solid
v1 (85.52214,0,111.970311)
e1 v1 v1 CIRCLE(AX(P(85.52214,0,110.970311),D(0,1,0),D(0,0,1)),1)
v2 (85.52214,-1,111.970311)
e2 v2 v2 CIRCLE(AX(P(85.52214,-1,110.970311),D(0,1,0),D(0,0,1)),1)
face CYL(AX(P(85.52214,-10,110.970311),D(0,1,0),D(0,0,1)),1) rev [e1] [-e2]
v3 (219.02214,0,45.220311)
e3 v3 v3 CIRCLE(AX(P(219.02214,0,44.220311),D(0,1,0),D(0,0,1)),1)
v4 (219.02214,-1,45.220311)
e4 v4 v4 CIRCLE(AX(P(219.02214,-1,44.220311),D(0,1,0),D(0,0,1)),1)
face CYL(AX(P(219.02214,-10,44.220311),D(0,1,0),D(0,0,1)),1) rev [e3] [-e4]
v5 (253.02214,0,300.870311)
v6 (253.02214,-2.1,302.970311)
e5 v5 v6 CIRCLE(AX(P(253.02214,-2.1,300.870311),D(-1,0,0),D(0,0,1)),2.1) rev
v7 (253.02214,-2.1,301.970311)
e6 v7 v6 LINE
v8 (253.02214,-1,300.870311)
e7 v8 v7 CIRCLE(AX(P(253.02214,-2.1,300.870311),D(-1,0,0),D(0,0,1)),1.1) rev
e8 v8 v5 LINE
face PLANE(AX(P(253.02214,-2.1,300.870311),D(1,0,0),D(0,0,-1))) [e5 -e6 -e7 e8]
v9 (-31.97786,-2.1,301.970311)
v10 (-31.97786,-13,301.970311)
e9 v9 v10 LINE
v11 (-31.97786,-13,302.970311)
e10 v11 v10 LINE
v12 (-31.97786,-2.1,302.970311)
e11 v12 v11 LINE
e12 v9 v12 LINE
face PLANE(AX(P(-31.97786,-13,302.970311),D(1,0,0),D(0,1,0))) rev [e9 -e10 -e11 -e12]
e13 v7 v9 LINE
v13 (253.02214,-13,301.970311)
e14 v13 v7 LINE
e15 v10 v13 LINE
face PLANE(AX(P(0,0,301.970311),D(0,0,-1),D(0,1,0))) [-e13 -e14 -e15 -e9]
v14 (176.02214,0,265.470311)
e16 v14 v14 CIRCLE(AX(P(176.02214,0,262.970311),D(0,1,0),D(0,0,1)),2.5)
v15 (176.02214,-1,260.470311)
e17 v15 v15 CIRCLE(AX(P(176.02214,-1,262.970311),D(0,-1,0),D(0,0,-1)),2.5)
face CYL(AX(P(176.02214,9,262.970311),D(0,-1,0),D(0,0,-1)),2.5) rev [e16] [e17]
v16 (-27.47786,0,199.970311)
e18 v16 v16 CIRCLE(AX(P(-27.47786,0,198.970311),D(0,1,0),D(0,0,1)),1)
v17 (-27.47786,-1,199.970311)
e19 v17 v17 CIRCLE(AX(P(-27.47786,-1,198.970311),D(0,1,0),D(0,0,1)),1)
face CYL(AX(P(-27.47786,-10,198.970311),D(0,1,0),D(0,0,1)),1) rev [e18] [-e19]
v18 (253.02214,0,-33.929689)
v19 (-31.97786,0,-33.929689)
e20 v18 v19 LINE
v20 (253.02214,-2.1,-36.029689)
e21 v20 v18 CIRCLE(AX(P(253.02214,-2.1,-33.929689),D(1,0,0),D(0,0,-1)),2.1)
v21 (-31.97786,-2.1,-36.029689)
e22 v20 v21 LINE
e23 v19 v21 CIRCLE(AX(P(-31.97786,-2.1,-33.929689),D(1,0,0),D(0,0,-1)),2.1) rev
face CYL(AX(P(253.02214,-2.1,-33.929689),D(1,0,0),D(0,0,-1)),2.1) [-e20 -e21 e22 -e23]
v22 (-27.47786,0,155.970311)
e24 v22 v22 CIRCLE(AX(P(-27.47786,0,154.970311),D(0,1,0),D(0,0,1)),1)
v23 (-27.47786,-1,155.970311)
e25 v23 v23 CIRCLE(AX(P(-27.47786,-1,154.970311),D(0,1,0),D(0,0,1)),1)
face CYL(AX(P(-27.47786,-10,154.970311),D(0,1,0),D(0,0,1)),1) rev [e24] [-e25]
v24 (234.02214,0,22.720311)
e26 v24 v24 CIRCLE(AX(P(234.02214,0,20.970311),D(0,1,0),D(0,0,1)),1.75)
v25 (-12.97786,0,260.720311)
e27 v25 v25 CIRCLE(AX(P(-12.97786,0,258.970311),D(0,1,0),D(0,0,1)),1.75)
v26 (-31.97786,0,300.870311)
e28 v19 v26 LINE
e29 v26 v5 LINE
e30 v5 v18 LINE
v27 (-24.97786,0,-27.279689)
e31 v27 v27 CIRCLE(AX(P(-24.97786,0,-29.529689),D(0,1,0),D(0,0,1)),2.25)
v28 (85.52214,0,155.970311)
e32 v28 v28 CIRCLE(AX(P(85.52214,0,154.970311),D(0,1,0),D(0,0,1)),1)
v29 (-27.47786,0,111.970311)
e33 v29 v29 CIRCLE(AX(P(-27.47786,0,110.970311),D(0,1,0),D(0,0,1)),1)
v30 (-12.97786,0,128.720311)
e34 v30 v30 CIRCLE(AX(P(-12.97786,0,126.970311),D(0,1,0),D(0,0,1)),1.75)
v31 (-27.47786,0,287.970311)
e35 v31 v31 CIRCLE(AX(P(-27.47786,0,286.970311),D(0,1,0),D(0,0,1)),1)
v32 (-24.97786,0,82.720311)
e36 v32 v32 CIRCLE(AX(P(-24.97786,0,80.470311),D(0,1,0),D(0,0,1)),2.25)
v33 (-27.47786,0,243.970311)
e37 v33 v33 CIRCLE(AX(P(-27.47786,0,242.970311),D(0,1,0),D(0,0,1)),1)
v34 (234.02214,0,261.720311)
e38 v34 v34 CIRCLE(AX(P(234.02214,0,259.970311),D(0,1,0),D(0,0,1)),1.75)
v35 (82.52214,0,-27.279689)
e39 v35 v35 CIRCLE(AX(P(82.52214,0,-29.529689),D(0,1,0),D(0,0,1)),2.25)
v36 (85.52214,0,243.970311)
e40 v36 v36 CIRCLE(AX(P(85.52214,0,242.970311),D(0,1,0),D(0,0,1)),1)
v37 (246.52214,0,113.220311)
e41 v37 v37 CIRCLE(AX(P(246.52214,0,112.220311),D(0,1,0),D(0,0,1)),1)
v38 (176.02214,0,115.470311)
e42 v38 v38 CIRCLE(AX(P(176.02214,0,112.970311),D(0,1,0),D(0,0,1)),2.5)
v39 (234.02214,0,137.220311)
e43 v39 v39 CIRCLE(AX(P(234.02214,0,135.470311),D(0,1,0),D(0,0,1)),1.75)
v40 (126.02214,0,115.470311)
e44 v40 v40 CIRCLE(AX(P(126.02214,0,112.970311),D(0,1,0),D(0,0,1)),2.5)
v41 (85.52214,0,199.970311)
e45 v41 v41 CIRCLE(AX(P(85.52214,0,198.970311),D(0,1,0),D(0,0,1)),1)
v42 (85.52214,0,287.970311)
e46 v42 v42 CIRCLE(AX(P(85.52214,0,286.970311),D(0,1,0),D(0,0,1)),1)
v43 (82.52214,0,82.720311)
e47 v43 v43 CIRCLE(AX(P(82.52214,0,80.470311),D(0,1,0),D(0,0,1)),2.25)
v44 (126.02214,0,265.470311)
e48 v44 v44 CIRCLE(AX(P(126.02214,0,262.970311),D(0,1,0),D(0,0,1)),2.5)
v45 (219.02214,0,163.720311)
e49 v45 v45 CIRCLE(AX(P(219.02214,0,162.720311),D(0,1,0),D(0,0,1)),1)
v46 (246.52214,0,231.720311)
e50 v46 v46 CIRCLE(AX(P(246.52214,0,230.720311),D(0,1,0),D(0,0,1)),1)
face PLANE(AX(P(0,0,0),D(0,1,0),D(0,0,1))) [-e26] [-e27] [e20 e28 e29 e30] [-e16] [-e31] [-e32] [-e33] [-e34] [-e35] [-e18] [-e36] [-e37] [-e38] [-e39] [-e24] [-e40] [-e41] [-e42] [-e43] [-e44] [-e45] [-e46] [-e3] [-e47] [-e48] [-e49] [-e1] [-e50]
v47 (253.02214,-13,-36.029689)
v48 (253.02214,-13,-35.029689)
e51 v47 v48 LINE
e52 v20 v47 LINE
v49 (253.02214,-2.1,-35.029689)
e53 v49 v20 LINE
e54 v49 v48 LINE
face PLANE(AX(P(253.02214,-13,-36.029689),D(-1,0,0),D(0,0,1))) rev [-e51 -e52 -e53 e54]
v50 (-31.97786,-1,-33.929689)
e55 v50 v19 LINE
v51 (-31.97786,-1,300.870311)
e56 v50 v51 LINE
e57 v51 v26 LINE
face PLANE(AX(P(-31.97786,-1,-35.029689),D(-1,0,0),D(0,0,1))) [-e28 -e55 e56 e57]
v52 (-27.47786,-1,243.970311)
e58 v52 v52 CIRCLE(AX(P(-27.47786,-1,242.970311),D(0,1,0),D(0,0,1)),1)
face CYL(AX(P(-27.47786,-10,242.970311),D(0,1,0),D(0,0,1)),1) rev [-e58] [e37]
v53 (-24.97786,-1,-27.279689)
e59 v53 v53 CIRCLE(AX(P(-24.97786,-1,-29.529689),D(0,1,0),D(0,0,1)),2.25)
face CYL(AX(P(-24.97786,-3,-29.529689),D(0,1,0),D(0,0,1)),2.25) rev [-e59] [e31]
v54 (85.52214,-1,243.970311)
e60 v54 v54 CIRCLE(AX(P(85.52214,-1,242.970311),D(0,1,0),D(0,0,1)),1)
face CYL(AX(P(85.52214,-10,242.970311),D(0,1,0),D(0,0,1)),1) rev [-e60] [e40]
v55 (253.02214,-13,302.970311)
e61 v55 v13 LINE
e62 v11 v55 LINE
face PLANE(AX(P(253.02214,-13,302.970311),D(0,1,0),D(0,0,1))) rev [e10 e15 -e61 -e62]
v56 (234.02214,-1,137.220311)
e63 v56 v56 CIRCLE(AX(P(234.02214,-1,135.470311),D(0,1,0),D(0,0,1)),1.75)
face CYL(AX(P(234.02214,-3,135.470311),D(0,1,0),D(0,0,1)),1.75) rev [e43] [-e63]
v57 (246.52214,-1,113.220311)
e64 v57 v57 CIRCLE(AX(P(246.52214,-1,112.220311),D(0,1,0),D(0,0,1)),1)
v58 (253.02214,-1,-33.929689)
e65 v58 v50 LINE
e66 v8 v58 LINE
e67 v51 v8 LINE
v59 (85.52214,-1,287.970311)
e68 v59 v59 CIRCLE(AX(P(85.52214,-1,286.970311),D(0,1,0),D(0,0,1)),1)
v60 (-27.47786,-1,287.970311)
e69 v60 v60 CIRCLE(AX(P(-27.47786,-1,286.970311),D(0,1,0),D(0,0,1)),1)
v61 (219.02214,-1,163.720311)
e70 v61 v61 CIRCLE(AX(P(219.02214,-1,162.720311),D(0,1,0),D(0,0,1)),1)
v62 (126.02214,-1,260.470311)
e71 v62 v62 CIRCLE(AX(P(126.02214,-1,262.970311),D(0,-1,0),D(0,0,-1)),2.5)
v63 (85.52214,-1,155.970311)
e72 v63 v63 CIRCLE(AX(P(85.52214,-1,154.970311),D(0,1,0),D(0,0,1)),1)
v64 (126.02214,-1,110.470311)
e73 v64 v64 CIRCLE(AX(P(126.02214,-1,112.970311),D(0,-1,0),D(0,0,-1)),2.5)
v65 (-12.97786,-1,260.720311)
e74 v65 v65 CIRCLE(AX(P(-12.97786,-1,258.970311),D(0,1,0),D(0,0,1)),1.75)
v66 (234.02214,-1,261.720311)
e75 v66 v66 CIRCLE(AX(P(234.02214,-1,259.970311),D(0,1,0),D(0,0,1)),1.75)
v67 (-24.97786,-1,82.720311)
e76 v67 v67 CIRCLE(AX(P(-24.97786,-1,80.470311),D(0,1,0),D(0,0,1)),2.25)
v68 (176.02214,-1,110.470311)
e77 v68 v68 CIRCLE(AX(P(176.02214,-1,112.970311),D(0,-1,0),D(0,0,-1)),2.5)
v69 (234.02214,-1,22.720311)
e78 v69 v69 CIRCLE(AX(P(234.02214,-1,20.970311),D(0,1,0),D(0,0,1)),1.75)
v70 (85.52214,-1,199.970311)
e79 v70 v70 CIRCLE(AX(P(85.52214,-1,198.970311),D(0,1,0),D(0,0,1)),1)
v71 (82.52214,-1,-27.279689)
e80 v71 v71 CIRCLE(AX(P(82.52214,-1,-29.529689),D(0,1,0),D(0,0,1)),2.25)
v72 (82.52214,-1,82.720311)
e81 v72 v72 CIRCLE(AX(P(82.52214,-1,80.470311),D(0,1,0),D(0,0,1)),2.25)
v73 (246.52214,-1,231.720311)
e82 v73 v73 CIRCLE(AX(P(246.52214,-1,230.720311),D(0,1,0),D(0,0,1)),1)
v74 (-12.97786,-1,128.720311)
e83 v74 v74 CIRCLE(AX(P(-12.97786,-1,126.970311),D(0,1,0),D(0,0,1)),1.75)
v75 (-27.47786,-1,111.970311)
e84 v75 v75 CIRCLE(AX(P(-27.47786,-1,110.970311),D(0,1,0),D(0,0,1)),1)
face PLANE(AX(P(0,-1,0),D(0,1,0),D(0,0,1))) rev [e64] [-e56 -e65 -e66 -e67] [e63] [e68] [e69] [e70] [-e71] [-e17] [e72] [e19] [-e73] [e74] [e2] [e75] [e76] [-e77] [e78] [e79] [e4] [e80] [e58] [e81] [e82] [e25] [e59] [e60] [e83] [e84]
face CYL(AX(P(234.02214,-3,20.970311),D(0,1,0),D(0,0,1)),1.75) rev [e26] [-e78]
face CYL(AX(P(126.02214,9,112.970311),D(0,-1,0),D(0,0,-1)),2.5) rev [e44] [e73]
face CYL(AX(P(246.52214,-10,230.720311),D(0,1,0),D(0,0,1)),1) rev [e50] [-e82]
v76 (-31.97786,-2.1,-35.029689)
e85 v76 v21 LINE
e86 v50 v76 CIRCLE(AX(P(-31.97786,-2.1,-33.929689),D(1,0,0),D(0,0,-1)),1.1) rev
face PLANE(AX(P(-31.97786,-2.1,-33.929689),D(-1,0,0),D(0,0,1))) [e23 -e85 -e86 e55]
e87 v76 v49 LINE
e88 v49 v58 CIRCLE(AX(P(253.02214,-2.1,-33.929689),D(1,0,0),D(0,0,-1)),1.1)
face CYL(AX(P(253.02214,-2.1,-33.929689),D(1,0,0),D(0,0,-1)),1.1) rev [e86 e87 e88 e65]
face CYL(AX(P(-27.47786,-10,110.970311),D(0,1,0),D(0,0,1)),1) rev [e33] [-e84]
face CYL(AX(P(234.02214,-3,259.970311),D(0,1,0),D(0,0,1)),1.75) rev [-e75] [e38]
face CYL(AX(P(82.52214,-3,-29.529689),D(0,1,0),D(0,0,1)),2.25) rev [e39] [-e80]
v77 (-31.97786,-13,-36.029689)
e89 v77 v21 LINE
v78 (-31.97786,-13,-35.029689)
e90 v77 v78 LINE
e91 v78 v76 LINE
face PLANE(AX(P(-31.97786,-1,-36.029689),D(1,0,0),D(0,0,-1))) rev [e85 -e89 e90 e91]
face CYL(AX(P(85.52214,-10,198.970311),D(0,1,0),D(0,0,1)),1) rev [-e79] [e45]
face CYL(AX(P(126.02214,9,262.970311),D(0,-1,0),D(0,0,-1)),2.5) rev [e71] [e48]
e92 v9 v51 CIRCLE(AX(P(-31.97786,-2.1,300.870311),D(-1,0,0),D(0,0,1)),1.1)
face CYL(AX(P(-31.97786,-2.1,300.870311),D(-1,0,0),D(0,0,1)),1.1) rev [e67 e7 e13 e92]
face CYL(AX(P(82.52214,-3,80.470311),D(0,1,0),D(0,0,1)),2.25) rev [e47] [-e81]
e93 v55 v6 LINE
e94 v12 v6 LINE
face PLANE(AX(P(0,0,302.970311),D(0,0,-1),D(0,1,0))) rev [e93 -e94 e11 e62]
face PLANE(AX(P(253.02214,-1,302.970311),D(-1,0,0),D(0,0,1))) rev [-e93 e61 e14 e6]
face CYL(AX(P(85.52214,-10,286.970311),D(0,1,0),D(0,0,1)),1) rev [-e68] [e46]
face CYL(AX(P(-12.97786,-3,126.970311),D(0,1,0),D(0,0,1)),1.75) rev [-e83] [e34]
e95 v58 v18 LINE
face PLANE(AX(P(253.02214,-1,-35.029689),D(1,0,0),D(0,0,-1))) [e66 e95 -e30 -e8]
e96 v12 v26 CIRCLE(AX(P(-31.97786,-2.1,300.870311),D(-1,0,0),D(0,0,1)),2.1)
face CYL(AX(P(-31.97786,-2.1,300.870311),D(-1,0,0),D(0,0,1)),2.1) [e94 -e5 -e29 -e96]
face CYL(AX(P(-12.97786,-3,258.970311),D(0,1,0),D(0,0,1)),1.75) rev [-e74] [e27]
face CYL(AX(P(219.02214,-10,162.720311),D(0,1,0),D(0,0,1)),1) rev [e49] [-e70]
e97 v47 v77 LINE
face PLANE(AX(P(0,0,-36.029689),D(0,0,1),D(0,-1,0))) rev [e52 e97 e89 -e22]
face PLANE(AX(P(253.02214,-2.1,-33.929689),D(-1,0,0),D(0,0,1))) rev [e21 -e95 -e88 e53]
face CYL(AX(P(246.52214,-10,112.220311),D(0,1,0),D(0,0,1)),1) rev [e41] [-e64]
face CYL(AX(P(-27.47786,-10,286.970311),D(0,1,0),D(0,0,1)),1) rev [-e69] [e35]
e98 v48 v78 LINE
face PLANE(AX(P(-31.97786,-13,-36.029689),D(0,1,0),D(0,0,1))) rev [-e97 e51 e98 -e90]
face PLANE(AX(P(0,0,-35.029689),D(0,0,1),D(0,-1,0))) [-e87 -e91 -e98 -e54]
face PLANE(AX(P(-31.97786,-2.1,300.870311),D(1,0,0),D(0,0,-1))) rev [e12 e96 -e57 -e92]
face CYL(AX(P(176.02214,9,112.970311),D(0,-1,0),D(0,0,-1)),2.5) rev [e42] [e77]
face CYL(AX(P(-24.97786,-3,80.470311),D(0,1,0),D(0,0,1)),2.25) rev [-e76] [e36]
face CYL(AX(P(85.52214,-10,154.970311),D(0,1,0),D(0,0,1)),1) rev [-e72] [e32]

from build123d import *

# Parameters (mm, degrees)
SKETCH_1_W                         = 285
SKETCH_1_H                         = 337
SM_BASE_FLANGE_1_DEPTH             = 1
SM_EDGE_FLANGE_1_STRIP_W           = 6.2
SM_EDGE_FLANGE_1_STRIP_H           = 1
SM_EDGE_FLANGE_1_STRIP_CUT_DEPTH   = 285
SM_EDGE_FLANGE_1_STRIP_2_W         = 6.2
SM_EDGE_FLANGE_1_STRIP_2_H         = 1
SM_EDGE_FLANGE_1_STRIP_CUT_2_DEPTH = 285
SM_EDGE_FLANGE_1_DEPTH             = 285
SM_EDGE_FLANGE_1_BEND_DEPTH        = 285
SKETCH_10_R                        = 1
CUT_EXTRUDE_1_DEPTH                = 10
SKETCH_11_R                        = 2.25
CUT_EXTRUDE_2_DEPTH                = 3
SKETCH_12_R                        = 1.75
CUT_EXTRUDE_3_DEPTH                = 3
SKETCH_13_R                        = 2.5
CUT_EXTRUDE_4_DEPTH                = 10


# Sheet-metal steps are written as plain solids
with BuildPart() as part:
    # Sketch 1 → Базовая кромка1 (new body)
    with BuildSketch(Plane(origin=(0, 0, 0), x_dir=(1, 0, 0), z_dir=(0, 1, 0))):
        with Locations((110.522140356, -133.470311428)):
            Rectangle(SKETCH_1_W, SKETCH_1_H)
    extrude(amount=-SM_BASE_FLANGE_1_DEPTH)

    # Ребро-кромка1 strip (across the edge) → Ребро-кромка1 strip cut (cut)
    with BuildSketch(Plane(origin=(253.022140356, -1, 301.970311428), x_dir=(0, 0, -1), z_dir=(-1, 0, 0))):
        with Locations((-2, -0.5)):
            Rectangle(SM_EDGE_FLANGE_1_STRIP_W, SM_EDGE_FLANGE_1_STRIP_H)
    extrude(amount=SM_EDGE_FLANGE_1_STRIP_CUT_DEPTH, mode=Mode.SUBTRACT)

    # Ребро-кромка1 strip 2 (across the edge) → Ребро-кромка1 strip cut 2 (cut)
    with BuildSketch(Plane(origin=(-31.977859644, -1, -35.029688572), x_dir=(0, 0, 1), z_dir=(1, 0, 0))):
        with Locations((-2, -0.5)):
            Rectangle(SM_EDGE_FLANGE_1_STRIP_2_W, SM_EDGE_FLANGE_1_STRIP_2_H)
    extrude(amount=SM_EDGE_FLANGE_1_STRIP_CUT_2_DEPTH, mode=Mode.SUBTRACT)

    # Ребро-кромка1 section (across the edge) → Ребро-кромка1 (add)
    with BuildSketch(Plane(origin=(253.022140356, -1, 301.970311428), x_dir=(0, 0, -1), z_dir=(-1, 0, 0))):
        with BuildLine():
            Line((-1, 1.1), (-1, 12))
            Line((-1, 12), (0, 12))
            Line((0, 12), (0, 1.1))
            ThreePointArc((0, 1.1), (0.322182541, 0.322182541), (1.1, 0))
            Line((1.1, 0), (1.1, -1))
            ThreePointArc((1.1, -1), (-0.38492424, -0.38492424), (-1, 1.1))
        make_face()
    extrude(amount=SM_EDGE_FLANGE_1_DEPTH)

    # Ребро-кромка1 section 2 (across the edge) → Ребро-кромка1 bend (add)
    with BuildSketch(Plane(origin=(-31.977859644, -1, -35.029688572), x_dir=(0, 0, 1), z_dir=(1, 0, 0))):
        with BuildLine():
            Line((-1, 1.1), (-1, 12))
            Line((-1, 12), (0, 12))
            Line((0, 12), (0, 1.1))
            ThreePointArc((0, 1.1), (0.322182541, 0.322182541), (1.1, 0))
            Line((1.1, 0), (1.1, -1))
            ThreePointArc((1.1, -1), (-0.38492424, -0.38492424), (-1, 1.1))
        make_face()
    extrude(amount=SM_EDGE_FLANGE_1_BEND_DEPTH)

    # Эскиз10 → Вырез-Вытянуть1 (cut)
    with BuildSketch(Plane(origin=(0, 0, 0), x_dir=(1, 0, 0), z_dir=(0, 1, 0))):
        with Locations(Location((-27.477859644, -110.970311428, 0), (0, 0, 270))):
            Circle(SKETCH_10_R)
        with Locations(Location((85.522140356, -110.970311428, 0), (0, 0, 270))):
            Circle(SKETCH_10_R)
        with Locations(Location((85.522140356, -154.970311428, 0), (0, 0, 270))):
            Circle(SKETCH_10_R)
        with Locations(Location((-27.477859644, -154.970311428, 0), (0, 0, 270))):
            Circle(SKETCH_10_R)
        with Locations(Location((-27.477859644, -198.970311428, 0), (0, 0, 270))):
            Circle(SKETCH_10_R)
        with Locations(Location((85.522140356, -198.970311428, 0), (0, 0, 270))):
            Circle(SKETCH_10_R)
        with Locations(Location((-27.477859644, -242.970311428, 0), (0, 0, 270))):
            Circle(SKETCH_10_R)
        with Locations(Location((85.522140356, -242.970311428, 0), (0, 0, 270))):
            Circle(SKETCH_10_R)
        with Locations(Location((85.522140356, -286.970311428, 0), (0, 0, 270))):
            Circle(SKETCH_10_R)
        with Locations(Location((-27.477859644, -286.970311428, 0), (0, 0, 270))):
            Circle(SKETCH_10_R)
        with Locations(Location((246.522140356, -230.720311428, 0), (0, 0, 270))):
            Circle(SKETCH_10_R)
        with Locations(Location((219.022140356, -162.720311428, 0), (0, 0, 270))):
            Circle(SKETCH_10_R)
        with Locations(Location((246.522140356, -112.220311428, 0), (0, 0, 270))):
            Circle(SKETCH_10_R)
        with Locations(Location((219.022140356, -44.220311428, 0), (0, 0, 270))):
            Circle(SKETCH_10_R)
    extrude(amount=-CUT_EXTRUDE_1_DEPTH, mode=Mode.SUBTRACT)

    # Эскиз11 → Вырез-Вытянуть2 (cut)
    with BuildSketch(Plane(origin=(0, 0, 0), x_dir=(1, 0, 0), z_dir=(0, 1, 0))):
        with Locations(Location((82.522140356, 29.529688572, 0), (0, 0, 270))):
            Circle(SKETCH_11_R)
        with Locations(Location((82.522140356, -80.470311428, 0), (0, 0, 270))):
            Circle(SKETCH_11_R)
        with Locations(Location((-24.977859644, -80.470311428, 0), (0, 0, 270))):
            Circle(SKETCH_11_R)
        with Locations(Location((-24.977859644, 29.529688572, 0), (0, 0, 270))):
            Circle(SKETCH_11_R)
    extrude(amount=-CUT_EXTRUDE_2_DEPTH, mode=Mode.SUBTRACT)

    # Эскиз12 → Вырез-Вытянуть3 (cut)
    with BuildSketch(Plane(origin=(0, 0, 0), x_dir=(1, 0, 0), z_dir=(0, 1, 0))):
        with Locations(Location((-12.977859644, -126.970311428, 0), (0, 0, 270))):
            Circle(SKETCH_12_R)
        with Locations(Location((234.022140356, -20.970311428, 0), (0, 0, 270))):
            Circle(SKETCH_12_R)
        with Locations(Location((234.022140356, -135.470311428, 0), (0, 0, 270))):
            Circle(SKETCH_12_R)
        with Locations(Location((-12.977859644, -258.970311428, 0), (0, 0, 270))):
            Circle(SKETCH_12_R)
        with Locations(Location((234.022140356, -259.970311428, 0), (0, 0, 270))):
            Circle(SKETCH_12_R)
    extrude(amount=-CUT_EXTRUDE_3_DEPTH, mode=Mode.SUBTRACT)

    # Эскиз13 → Вырез-Вытянуть4 (cut)
    with BuildSketch(Plane.XZ.offset(1)):
        with Locations(Location((126.022140356, 262.970311428, 0), (0, 0, 270))):
            Circle(SKETCH_13_R)
        with Locations(Location((176.022140356, 262.970311428, 0), (0, 0, 270))):
            Circle(SKETCH_13_R)
        with Locations(Location((126.022140356, 112.970311428, 0), (0, 0, 270))):
            Circle(SKETCH_13_R)
        with Locations(Location((176.022140356, 112.970311428, 0), (0, 0, 270))):
            Circle(SKETCH_13_R)
    extrude(amount=-CUT_EXTRUDE_4_DEPTH, mode=Mode.SUBTRACT)


solid = part.part
